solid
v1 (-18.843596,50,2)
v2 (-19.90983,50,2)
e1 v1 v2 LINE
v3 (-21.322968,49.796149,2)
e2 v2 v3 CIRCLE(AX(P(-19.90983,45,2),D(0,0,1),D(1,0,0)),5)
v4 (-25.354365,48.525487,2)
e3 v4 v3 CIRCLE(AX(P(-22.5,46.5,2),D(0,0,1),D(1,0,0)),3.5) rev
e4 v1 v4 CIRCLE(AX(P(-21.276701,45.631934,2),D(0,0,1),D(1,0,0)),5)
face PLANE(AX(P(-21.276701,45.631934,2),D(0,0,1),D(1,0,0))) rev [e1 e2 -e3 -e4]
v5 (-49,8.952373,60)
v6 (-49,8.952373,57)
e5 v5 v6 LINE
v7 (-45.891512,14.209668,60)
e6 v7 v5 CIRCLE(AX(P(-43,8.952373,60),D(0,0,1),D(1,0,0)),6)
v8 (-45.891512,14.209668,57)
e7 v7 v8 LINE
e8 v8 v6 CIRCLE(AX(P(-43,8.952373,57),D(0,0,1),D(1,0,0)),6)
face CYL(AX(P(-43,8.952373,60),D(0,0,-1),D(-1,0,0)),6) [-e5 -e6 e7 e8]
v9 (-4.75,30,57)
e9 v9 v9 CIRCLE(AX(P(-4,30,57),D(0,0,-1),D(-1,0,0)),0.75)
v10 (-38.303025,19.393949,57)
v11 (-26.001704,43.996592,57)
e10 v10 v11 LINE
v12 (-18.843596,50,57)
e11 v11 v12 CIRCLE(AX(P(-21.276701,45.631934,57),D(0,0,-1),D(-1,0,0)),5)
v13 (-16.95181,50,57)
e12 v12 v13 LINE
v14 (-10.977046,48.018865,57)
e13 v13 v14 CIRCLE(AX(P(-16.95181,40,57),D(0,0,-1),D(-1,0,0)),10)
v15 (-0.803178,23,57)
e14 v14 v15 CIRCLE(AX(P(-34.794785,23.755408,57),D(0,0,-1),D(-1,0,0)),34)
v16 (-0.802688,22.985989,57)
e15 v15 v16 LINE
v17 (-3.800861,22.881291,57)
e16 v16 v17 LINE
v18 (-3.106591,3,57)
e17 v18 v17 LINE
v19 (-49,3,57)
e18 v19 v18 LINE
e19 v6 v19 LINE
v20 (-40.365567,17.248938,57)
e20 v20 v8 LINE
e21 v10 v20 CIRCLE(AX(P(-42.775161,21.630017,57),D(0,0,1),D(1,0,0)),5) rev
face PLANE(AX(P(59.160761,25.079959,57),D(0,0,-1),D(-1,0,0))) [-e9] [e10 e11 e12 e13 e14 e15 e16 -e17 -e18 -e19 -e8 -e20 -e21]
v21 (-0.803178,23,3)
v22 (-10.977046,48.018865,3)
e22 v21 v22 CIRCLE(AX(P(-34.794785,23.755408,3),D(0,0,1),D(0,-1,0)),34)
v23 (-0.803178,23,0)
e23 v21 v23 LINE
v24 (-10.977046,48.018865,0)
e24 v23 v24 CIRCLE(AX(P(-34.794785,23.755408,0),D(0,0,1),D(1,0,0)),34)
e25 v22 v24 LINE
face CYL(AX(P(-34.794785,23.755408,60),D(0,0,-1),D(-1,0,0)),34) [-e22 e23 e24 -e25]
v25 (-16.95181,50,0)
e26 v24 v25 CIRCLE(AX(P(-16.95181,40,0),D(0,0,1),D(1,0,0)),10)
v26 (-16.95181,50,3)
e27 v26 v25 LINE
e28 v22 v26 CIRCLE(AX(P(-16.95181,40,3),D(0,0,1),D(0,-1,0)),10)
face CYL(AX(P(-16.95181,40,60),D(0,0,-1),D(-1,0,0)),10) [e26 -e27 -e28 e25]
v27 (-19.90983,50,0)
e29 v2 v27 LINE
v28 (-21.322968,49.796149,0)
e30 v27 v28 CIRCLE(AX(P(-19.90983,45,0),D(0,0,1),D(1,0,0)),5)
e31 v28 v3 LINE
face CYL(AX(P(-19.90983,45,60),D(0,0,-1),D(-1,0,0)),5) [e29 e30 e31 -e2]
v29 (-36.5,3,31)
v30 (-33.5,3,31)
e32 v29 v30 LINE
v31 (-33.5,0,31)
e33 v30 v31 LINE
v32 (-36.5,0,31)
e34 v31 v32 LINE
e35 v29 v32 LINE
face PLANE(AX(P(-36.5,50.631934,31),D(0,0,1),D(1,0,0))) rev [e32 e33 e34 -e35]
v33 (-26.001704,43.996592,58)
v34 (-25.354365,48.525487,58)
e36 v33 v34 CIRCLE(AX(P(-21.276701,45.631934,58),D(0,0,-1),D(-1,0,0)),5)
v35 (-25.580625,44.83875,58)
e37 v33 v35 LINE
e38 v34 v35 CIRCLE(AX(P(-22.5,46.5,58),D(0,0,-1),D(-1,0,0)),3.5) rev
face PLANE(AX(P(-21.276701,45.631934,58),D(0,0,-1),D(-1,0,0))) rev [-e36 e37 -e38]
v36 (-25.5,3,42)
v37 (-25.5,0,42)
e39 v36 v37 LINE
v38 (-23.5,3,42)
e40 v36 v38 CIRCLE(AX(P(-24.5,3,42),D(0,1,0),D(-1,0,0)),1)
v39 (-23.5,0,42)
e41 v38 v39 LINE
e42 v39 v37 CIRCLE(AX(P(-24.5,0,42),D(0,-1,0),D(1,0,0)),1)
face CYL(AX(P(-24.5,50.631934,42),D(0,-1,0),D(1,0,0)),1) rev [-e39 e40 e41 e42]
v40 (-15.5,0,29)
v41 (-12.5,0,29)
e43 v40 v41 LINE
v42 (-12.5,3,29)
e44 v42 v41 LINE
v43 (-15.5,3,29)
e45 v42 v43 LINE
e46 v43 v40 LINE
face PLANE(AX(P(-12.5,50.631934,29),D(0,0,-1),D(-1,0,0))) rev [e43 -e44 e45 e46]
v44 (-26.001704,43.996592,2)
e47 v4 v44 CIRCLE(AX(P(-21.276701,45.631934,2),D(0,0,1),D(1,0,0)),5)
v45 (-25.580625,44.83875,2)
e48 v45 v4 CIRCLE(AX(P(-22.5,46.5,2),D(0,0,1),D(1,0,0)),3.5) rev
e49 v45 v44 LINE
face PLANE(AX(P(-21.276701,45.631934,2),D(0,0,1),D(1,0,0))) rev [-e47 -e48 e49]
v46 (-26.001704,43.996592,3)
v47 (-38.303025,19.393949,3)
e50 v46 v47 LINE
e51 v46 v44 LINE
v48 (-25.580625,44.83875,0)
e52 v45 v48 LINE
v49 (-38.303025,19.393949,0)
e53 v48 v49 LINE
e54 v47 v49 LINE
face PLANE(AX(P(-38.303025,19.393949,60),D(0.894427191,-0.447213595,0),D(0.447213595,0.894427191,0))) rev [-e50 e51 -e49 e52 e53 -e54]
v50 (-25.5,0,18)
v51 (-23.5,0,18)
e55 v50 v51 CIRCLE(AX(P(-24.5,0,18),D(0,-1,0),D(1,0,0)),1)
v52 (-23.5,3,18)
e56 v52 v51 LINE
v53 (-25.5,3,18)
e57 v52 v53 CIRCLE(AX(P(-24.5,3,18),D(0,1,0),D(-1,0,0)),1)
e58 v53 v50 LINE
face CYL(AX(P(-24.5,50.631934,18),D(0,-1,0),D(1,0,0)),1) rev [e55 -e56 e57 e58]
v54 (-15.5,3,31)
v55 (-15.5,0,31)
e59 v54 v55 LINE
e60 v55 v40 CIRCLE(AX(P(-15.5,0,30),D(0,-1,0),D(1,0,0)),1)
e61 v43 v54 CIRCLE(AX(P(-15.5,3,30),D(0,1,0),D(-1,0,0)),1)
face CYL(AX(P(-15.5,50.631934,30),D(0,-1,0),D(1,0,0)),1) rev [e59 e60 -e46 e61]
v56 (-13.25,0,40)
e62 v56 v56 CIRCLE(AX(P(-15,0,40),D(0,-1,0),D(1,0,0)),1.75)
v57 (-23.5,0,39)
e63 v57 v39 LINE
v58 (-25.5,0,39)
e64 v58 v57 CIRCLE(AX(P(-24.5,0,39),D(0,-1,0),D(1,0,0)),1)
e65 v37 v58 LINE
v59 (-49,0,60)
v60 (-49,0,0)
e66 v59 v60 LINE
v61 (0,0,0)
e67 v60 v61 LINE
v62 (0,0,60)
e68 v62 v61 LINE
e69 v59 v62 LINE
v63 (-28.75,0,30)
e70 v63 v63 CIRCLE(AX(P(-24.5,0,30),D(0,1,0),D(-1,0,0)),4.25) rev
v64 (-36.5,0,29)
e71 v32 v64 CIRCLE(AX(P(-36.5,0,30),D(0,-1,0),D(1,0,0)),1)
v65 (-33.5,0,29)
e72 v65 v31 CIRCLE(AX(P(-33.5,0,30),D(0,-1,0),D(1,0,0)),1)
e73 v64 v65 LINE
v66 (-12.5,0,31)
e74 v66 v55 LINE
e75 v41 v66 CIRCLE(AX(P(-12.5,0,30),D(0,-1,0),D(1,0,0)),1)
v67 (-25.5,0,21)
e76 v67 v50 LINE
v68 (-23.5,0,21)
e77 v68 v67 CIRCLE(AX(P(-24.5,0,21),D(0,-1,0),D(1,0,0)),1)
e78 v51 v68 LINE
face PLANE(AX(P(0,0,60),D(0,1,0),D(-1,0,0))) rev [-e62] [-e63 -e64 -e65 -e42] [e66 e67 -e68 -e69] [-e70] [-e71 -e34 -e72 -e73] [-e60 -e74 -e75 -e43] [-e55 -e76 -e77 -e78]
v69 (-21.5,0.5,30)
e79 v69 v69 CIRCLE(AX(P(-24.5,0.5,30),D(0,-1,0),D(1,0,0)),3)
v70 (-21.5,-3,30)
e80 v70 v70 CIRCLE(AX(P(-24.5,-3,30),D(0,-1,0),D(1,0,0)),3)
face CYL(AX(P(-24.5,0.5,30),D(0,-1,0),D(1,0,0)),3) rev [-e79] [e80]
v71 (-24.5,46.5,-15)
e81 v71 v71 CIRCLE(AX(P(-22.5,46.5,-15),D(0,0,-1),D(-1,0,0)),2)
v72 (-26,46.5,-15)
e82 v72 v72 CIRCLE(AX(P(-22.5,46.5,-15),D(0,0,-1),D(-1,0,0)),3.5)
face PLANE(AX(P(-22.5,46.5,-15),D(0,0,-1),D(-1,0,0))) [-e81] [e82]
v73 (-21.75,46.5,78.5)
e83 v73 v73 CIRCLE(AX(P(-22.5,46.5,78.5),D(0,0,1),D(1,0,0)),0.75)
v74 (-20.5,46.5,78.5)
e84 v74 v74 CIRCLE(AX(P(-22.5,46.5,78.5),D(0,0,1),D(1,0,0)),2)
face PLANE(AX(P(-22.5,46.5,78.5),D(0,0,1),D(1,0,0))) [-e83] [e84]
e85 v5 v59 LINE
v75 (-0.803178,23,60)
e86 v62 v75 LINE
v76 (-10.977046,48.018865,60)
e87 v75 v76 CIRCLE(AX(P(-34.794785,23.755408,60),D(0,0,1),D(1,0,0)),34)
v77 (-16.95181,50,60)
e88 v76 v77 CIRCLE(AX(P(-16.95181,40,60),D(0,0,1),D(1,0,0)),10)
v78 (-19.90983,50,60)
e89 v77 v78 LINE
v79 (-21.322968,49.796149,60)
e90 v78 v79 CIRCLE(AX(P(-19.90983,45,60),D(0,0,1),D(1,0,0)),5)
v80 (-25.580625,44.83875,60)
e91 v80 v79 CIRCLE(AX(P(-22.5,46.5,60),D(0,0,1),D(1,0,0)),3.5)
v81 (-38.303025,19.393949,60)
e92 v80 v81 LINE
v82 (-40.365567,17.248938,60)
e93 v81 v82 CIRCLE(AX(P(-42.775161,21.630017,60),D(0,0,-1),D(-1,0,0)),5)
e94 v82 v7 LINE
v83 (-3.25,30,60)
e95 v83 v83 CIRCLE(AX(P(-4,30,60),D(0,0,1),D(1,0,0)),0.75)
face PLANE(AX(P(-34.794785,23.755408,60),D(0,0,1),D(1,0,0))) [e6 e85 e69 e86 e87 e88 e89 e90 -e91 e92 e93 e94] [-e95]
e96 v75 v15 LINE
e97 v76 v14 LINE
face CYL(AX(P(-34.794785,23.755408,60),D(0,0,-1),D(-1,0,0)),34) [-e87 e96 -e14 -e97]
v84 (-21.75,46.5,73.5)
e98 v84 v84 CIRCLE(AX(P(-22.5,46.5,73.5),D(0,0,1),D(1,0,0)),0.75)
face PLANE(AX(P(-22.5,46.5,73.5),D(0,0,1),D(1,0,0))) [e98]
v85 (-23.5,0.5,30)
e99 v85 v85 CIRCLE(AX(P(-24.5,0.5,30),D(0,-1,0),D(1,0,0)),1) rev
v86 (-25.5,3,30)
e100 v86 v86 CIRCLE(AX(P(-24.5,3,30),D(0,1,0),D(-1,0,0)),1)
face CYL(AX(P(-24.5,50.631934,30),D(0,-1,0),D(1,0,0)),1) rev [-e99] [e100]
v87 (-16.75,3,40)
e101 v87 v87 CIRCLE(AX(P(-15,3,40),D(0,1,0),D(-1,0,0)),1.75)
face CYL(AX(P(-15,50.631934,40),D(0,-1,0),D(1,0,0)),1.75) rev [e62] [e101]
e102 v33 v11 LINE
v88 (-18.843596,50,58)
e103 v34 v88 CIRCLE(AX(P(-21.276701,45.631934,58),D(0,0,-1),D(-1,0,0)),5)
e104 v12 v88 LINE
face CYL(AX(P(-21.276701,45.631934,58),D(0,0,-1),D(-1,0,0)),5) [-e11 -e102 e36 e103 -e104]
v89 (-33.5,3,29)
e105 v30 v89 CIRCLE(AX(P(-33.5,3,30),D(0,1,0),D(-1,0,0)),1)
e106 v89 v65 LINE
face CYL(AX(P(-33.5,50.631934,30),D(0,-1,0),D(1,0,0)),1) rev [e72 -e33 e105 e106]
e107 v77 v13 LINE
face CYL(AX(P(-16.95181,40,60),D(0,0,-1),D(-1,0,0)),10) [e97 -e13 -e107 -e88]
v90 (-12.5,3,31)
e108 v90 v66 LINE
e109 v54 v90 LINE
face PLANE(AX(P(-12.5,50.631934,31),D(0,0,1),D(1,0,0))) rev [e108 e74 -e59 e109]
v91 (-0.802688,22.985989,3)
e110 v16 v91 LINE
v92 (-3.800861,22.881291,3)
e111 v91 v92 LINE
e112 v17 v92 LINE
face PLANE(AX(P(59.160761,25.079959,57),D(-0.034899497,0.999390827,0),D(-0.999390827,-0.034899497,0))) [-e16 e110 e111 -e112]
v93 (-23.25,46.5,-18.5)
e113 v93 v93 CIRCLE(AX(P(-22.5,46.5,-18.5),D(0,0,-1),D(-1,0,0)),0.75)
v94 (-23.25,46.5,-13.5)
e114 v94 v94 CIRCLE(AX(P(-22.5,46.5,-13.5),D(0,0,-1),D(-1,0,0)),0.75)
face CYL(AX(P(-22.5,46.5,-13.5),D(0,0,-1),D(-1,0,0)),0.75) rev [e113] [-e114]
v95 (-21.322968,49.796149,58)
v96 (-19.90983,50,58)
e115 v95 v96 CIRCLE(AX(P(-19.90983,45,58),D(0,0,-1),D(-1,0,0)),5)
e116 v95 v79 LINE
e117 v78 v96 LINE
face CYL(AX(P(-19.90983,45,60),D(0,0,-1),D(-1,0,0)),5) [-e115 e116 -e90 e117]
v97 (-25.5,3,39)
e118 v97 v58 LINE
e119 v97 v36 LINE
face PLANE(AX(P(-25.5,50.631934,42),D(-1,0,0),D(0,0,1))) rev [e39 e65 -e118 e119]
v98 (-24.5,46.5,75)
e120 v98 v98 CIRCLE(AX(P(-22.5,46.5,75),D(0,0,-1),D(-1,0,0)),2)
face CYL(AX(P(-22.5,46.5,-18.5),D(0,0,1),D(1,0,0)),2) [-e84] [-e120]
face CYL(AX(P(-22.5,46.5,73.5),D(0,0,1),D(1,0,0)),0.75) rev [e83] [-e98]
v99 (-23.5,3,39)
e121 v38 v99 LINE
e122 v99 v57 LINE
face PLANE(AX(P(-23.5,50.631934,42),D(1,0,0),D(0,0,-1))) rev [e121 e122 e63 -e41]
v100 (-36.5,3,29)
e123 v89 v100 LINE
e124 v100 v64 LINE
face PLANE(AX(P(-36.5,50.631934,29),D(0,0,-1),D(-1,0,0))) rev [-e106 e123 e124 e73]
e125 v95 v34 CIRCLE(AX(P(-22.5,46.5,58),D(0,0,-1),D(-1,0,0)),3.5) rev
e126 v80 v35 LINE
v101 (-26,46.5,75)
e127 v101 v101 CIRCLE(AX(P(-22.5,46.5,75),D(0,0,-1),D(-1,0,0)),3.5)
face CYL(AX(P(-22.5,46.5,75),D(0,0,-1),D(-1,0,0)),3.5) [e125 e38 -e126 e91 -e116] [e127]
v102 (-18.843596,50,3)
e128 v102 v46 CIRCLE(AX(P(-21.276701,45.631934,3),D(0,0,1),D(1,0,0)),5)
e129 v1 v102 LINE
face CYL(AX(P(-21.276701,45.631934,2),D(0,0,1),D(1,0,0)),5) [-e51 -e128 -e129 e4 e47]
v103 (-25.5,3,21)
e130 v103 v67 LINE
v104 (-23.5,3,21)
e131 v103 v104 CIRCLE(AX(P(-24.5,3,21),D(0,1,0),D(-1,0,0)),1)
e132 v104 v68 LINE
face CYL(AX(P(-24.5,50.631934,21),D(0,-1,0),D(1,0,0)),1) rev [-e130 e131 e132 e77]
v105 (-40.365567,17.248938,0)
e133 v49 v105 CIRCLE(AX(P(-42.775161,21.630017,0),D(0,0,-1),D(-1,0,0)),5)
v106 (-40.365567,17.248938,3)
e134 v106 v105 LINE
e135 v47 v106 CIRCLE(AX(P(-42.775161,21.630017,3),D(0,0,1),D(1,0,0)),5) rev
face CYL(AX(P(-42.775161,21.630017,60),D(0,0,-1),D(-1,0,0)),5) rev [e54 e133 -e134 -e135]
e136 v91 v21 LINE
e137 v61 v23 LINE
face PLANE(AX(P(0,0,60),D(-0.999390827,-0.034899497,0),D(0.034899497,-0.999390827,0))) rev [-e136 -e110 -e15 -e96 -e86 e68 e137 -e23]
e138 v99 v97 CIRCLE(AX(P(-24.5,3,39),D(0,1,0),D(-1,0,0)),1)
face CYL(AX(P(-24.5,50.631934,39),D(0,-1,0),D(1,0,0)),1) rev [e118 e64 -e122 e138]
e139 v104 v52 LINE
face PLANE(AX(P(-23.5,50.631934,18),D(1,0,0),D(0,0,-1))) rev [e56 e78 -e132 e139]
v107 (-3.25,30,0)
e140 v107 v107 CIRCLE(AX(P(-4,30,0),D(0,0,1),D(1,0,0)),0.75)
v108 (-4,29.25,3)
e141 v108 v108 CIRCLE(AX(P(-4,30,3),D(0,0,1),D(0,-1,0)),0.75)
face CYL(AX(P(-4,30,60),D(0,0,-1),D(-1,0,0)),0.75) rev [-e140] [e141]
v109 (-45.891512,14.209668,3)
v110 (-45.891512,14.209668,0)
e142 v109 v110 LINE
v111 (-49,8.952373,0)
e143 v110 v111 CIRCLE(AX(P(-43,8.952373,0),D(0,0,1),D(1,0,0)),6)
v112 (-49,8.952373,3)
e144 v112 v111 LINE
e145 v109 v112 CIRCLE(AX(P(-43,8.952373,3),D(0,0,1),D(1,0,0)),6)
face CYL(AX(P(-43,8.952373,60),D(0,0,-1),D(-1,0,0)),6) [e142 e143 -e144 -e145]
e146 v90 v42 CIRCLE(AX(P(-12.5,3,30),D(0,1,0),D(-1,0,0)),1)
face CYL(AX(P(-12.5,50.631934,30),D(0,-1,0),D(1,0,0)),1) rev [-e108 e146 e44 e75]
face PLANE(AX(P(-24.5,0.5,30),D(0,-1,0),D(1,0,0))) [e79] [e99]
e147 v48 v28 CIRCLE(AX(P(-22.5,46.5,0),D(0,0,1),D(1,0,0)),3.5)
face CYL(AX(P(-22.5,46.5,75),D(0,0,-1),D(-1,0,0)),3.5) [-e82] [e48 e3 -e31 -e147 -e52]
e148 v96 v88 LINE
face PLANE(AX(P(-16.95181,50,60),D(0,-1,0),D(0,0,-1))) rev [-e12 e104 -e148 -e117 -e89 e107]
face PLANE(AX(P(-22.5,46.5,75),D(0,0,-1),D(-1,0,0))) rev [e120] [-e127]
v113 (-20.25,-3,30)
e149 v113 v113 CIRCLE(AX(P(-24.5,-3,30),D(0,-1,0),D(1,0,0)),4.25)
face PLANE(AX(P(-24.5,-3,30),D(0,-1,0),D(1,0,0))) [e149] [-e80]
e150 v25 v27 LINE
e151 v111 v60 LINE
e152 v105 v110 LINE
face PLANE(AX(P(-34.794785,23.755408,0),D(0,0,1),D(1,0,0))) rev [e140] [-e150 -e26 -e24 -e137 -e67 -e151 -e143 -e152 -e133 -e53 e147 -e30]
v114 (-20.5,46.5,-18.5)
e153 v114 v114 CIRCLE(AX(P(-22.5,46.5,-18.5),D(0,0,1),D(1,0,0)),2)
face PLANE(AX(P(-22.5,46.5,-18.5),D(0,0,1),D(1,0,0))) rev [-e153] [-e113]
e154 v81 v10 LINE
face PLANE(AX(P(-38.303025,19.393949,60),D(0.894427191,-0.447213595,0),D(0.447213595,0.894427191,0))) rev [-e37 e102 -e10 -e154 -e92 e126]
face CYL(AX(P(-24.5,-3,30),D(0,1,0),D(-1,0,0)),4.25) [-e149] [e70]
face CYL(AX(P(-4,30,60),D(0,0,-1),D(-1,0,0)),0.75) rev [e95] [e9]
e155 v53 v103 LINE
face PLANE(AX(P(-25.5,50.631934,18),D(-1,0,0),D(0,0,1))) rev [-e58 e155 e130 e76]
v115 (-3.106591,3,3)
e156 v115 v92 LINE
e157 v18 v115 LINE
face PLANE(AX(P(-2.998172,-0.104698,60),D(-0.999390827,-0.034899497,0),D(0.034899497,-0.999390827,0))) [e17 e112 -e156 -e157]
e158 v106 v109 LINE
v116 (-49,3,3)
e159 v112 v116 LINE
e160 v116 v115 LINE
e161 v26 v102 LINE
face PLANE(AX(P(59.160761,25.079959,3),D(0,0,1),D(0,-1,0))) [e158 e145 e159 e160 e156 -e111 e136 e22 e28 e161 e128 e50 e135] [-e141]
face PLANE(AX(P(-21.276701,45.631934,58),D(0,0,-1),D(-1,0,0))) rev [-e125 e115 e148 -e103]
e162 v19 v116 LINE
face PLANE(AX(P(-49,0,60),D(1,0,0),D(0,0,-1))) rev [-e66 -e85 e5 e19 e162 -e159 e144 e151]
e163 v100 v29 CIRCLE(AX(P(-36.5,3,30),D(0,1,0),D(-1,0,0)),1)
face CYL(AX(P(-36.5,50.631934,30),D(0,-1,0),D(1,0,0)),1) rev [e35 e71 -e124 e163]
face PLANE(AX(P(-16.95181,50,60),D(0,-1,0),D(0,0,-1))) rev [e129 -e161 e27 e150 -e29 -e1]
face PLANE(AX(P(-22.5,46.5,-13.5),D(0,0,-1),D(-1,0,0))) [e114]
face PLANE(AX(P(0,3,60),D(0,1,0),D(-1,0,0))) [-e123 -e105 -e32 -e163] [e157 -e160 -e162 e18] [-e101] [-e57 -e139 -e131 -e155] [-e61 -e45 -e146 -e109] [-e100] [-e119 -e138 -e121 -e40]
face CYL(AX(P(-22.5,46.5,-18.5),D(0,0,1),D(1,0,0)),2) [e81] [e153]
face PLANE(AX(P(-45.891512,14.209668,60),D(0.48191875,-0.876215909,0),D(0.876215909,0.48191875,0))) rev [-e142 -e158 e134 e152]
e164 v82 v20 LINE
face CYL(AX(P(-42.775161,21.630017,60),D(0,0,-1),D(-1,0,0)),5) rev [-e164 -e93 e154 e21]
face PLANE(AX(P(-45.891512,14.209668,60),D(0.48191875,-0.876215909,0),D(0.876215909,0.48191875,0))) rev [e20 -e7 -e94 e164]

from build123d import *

# Parameters (mm, degrees)
ESQUISSE1_R                  = 0.75
BOSS_EXTRU_1_DEPTH           = 60
BOSS_EXTRU_2_DEPTH           = 15
BOSS_EXTRU_2_DEPTH_BACK      = 75
ESQUISSE3_R                  = 3.5
BOSS_EXTRU_6_DEPTH           = 3.5
BOSS_EXTRU_6_DEPTH_BACK      = 93.5
ESQUISSE9_R                  = 2
ENL_V_MAT_EXTRU_1_DEPTH      = 60
ENL_V_MAT_EXTRU_1_DEPTH_BACK = 60
ESQUISSE2_W                  = 54
ESQUISSE2_H                  = 49.893339448
COQUE1_START                 = 3
COQUE1_DEPTH                 = 54
ESQUISSE4_R                  = 5
BOSS_EXTRU_3_DEPTH           = 1
BOSS_EXTRU_4_START           = -1
ESQUISSE5_R                  = 5
BOSS_EXTRU_4_DEPTH           = 1
ESQUISSE6_R                  = 1
ESQUISSE6_R_2                = 1.75
ENL_V_MAT_EXTRU_2_DEPTH      = 106.483850595
ESQUISSE7_R                  = 4.25
BOSS_EXTRU_5_DEPTH           = 3
ESQUISSE8_R                  = 3
ENL_V_MAT_EXTRU_3_DEPTH      = 3.5
ESQUISSE10_R                 = 0.75
ENL_V_MAT_EXTRU_4_DEPTH      = 5
ENL_V_START                  = -5
ESQUISSE11_R                 = 0.75
ENL_V_MAT_EXTRU_5_DEPTH      = 5


# Read off the part's stored shape, not the designer's step: Coque1
with BuildPart() as part:
    # Esquisse1 → Boss.-Extru.1 (new body)
    with BuildSketch(Plane.XY):
        with BuildLine():
            Line((-45.891512499, 14.209668126), (-40.36556748, 17.248937886))
            ThreePointArc((-40.36556748, 17.248937886), (-39.171022, 18.164446709), (-38.303025274, 19.393949452))
            Line((-38.303025274, 19.393949452), (-24.381966011, 47.236067977))
            ThreePointArc((-24.381966011, 47.236067977), (-22.538485617, 49.253254042), (-19.909830056, 50))
            Line((-19.909830056, 50), (-16.951810307, 50))
            ThreePointArc((-16.951810307, 50), (-13.80448206, 49.491803038), (-10.977046344, 48.018864982))
            ThreePointArc((-10.977046344, 48.018864982), (-3.299292911, 36.562983614), (-0.803177698, 23))
            Line((-0.803177698, 23), (0, 0))
            Line((0, 0), (-49, 0))
            Line((-49, 0), (-49, 8.952372674))
            ThreePointArc((-49, 8.952372674), (-48.164739828, 12.006134698), (-45.891512499, 14.209668126))
        make_face()
        with Locations((-4, 30)):
            Circle(ESQUISSE1_R, mode=Mode.SUBTRACT)
    extrude(amount=BOSS_EXTRU_1_DEPTH)

    # Esquisse3 → Boss.-Extru.2 (add, two sides: drawn at the far end of the back side and taken through both)
    with BuildSketch(Plane(origin=(0, 0, 0), x_dir=(-1, 0, 0), z_dir=(0, 0, -1)).offset(-BOSS_EXTRU_2_DEPTH_BACK)):
        with Locations((22.5, 46.5)):
            Circle(ESQUISSE3_R)
    extrude(amount=BOSS_EXTRU_2_DEPTH + BOSS_EXTRU_2_DEPTH_BACK)

    # Esquisse9 → Boss.-Extru.6 (add, two sides: drawn at the far end of the back side and taken through both)
    with BuildSketch(Plane.XY.offset(75).offset(-BOSS_EXTRU_6_DEPTH_BACK)):
        with Locations((-22.5, 46.5)):
            Circle(ESQUISSE9_R)
    extrude(amount=BOSS_EXTRU_6_DEPTH + BOSS_EXTRU_6_DEPTH_BACK)

    # Esquisse2 → Enlèv. mat.-Extru.1 (cut, two sides: drawn at the far end of the back side and taken through both)
    with BuildSketch(Plane(origin=(0, 0, 0), x_dir=(0, 0, -1), z_dir=(0.999390827019096, 0.034899496702497666, 0)).offset(-ENL_V_MAT_EXTRU_1_DEPTH_BACK)):
        with Locations((-30, 47.946669724)):
            Rectangle(ESQUISSE2_W, ESQUISSE2_H)
    extrude(amount=ENL_V_MAT_EXTRU_1_DEPTH + ENL_V_MAT_EXTRU_1_DEPTH_BACK, mode=Mode.SUBTRACT)

    # Coque1 outline → Coque1 (cut)
    with BuildSketch(Plane.XY.offset(COQUE1_START)):
        with BuildLine():
            Line((-3.106590941, 3), (-3.800860905, 22.881290531))
            Line((-3.800860905, 22.881290531), (-37.141495034, 21.717009932))
            Line((-37.141495034, 21.717009932), (-38.303025274, 19.393949452))
            ThreePointArc((-38.303025274, 19.393949452), (-39.171022, 18.164446709), (-40.36556748, 17.248937886))
            Line((-40.36556748, 17.248937886), (-45.891512499, 14.209668126))
            ThreePointArc((-45.891512499, 14.209668126), (-48.164739828, 12.006134698), (-49, 8.952372674))
            Line((-49, 8.952372674), (-49, 3))
            Line((-49, 3), (-3.106590941, 3))
        make_face()
    extrude(amount=COQUE1_DEPTH, mode=Mode.SUBTRACT)

    # Esquisse4 → Boss.-Extru.3 (add)
    with BuildSketch(Plane.XY.offset(3)):
        with Locations((-21.27670063, 45.631933959)):
            Circle(ESQUISSE4_R)
    extrude(amount=-BOSS_EXTRU_3_DEPTH)

    # Esquisse5 → Boss.-Extru.4 (add)
    with BuildSketch(Plane(origin=(0, 0, 57), x_dir=(-1, 0, 0), z_dir=(0, 0, -1)).offset(BOSS_EXTRU_4_START)):
        with Locations((21.27670063, 45.631933959)):
            Circle(ESQUISSE5_R)
    extrude(amount=BOSS_EXTRU_4_DEPTH)

    # Esquisse6 → Enlèv. mat.-Extru.2 (cut, through all)
    with BuildSketch(Plane.XZ):
        with Locations((-24.5, 30)):
            Circle(ESQUISSE6_R)
        with Locations((-15, 40)):
            Circle(ESQUISSE6_R_2)
        with BuildLine():
            Line((-12.5, 29), (-15.5, 29))
            ThreePointArc((-15.5, 29), (-16.5, 30), (-15.5, 31))
            Line((-15.5, 31), (-12.5, 31))
            ThreePointArc((-12.5, 31), (-11.5, 30), (-12.5, 29))
        make_face()
        with BuildLine():
            Line((-25.5, 18), (-25.5, 21))
            ThreePointArc((-25.5, 21), (-24.5, 22), (-23.5, 21))
            Line((-23.5, 21), (-23.5, 18))
            ThreePointArc((-23.5, 18), (-24.5, 17), (-25.5, 18))
        make_face()
        with BuildLine():
            Line((-36.5, 31), (-33.5, 31))
            ThreePointArc((-33.5, 31), (-32.5, 30), (-33.5, 29))
            Line((-33.5, 29), (-36.5, 29))
            ThreePointArc((-36.5, 29), (-37.5, 30), (-36.5, 31))
        make_face()
        with BuildLine():
            Line((-23.5, 42), (-23.5, 39))
            ThreePointArc((-23.5, 39), (-24.5, 38), (-25.5, 39))
            Line((-25.5, 39), (-25.5, 42))
            ThreePointArc((-25.5, 42), (-24.5, 43), (-23.5, 42))
        make_face()
    extrude(amount=-ENL_V_MAT_EXTRU_2_DEPTH, mode=Mode.SUBTRACT)

    # Esquisse7 → Boss.-Extru.5 (add)
    with BuildSketch(Plane.XZ):
        with Locations(Location((-24.5, 30, 0), (0, 0, 180))):
            Circle(ESQUISSE7_R)
    extrude(amount=BOSS_EXTRU_5_DEPTH)

    # Esquisse8 → Enlèv. mat.-Extru.3 (cut)
    with BuildSketch(Plane.XZ.offset(3)):
        with Locations((-24.5, 30)):
            Circle(ESQUISSE8_R)
    extrude(amount=-ENL_V_MAT_EXTRU_3_DEPTH, mode=Mode.SUBTRACT)

    # Esquisse10 → Enlèv. mat.-Extru.4 (cut)
    with BuildSketch(Plane.XY.offset(78.5)):
        with Locations((-22.5, 46.5)):
            Circle(ESQUISSE10_R)
    extrude(amount=-ENL_V_MAT_EXTRU_4_DEPTH, mode=Mode.SUBTRACT)

    # Esquisse11 → Enlèv. mat.-Extru.5 (cut)
    with BuildSketch(Plane(origin=(0, 0, -18.5), x_dir=(-1, 0, 0), z_dir=(0, 0, -1)).offset(ENL_V_START)):
        with Locations(Location((22.5, 46.5, 0), (0, 0, 180))):
            Circle(ESQUISSE11_R)
    extrude(amount=ENL_V_MAT_EXTRU_5_DEPTH, mode=Mode.SUBTRACT)


solid = part.part
